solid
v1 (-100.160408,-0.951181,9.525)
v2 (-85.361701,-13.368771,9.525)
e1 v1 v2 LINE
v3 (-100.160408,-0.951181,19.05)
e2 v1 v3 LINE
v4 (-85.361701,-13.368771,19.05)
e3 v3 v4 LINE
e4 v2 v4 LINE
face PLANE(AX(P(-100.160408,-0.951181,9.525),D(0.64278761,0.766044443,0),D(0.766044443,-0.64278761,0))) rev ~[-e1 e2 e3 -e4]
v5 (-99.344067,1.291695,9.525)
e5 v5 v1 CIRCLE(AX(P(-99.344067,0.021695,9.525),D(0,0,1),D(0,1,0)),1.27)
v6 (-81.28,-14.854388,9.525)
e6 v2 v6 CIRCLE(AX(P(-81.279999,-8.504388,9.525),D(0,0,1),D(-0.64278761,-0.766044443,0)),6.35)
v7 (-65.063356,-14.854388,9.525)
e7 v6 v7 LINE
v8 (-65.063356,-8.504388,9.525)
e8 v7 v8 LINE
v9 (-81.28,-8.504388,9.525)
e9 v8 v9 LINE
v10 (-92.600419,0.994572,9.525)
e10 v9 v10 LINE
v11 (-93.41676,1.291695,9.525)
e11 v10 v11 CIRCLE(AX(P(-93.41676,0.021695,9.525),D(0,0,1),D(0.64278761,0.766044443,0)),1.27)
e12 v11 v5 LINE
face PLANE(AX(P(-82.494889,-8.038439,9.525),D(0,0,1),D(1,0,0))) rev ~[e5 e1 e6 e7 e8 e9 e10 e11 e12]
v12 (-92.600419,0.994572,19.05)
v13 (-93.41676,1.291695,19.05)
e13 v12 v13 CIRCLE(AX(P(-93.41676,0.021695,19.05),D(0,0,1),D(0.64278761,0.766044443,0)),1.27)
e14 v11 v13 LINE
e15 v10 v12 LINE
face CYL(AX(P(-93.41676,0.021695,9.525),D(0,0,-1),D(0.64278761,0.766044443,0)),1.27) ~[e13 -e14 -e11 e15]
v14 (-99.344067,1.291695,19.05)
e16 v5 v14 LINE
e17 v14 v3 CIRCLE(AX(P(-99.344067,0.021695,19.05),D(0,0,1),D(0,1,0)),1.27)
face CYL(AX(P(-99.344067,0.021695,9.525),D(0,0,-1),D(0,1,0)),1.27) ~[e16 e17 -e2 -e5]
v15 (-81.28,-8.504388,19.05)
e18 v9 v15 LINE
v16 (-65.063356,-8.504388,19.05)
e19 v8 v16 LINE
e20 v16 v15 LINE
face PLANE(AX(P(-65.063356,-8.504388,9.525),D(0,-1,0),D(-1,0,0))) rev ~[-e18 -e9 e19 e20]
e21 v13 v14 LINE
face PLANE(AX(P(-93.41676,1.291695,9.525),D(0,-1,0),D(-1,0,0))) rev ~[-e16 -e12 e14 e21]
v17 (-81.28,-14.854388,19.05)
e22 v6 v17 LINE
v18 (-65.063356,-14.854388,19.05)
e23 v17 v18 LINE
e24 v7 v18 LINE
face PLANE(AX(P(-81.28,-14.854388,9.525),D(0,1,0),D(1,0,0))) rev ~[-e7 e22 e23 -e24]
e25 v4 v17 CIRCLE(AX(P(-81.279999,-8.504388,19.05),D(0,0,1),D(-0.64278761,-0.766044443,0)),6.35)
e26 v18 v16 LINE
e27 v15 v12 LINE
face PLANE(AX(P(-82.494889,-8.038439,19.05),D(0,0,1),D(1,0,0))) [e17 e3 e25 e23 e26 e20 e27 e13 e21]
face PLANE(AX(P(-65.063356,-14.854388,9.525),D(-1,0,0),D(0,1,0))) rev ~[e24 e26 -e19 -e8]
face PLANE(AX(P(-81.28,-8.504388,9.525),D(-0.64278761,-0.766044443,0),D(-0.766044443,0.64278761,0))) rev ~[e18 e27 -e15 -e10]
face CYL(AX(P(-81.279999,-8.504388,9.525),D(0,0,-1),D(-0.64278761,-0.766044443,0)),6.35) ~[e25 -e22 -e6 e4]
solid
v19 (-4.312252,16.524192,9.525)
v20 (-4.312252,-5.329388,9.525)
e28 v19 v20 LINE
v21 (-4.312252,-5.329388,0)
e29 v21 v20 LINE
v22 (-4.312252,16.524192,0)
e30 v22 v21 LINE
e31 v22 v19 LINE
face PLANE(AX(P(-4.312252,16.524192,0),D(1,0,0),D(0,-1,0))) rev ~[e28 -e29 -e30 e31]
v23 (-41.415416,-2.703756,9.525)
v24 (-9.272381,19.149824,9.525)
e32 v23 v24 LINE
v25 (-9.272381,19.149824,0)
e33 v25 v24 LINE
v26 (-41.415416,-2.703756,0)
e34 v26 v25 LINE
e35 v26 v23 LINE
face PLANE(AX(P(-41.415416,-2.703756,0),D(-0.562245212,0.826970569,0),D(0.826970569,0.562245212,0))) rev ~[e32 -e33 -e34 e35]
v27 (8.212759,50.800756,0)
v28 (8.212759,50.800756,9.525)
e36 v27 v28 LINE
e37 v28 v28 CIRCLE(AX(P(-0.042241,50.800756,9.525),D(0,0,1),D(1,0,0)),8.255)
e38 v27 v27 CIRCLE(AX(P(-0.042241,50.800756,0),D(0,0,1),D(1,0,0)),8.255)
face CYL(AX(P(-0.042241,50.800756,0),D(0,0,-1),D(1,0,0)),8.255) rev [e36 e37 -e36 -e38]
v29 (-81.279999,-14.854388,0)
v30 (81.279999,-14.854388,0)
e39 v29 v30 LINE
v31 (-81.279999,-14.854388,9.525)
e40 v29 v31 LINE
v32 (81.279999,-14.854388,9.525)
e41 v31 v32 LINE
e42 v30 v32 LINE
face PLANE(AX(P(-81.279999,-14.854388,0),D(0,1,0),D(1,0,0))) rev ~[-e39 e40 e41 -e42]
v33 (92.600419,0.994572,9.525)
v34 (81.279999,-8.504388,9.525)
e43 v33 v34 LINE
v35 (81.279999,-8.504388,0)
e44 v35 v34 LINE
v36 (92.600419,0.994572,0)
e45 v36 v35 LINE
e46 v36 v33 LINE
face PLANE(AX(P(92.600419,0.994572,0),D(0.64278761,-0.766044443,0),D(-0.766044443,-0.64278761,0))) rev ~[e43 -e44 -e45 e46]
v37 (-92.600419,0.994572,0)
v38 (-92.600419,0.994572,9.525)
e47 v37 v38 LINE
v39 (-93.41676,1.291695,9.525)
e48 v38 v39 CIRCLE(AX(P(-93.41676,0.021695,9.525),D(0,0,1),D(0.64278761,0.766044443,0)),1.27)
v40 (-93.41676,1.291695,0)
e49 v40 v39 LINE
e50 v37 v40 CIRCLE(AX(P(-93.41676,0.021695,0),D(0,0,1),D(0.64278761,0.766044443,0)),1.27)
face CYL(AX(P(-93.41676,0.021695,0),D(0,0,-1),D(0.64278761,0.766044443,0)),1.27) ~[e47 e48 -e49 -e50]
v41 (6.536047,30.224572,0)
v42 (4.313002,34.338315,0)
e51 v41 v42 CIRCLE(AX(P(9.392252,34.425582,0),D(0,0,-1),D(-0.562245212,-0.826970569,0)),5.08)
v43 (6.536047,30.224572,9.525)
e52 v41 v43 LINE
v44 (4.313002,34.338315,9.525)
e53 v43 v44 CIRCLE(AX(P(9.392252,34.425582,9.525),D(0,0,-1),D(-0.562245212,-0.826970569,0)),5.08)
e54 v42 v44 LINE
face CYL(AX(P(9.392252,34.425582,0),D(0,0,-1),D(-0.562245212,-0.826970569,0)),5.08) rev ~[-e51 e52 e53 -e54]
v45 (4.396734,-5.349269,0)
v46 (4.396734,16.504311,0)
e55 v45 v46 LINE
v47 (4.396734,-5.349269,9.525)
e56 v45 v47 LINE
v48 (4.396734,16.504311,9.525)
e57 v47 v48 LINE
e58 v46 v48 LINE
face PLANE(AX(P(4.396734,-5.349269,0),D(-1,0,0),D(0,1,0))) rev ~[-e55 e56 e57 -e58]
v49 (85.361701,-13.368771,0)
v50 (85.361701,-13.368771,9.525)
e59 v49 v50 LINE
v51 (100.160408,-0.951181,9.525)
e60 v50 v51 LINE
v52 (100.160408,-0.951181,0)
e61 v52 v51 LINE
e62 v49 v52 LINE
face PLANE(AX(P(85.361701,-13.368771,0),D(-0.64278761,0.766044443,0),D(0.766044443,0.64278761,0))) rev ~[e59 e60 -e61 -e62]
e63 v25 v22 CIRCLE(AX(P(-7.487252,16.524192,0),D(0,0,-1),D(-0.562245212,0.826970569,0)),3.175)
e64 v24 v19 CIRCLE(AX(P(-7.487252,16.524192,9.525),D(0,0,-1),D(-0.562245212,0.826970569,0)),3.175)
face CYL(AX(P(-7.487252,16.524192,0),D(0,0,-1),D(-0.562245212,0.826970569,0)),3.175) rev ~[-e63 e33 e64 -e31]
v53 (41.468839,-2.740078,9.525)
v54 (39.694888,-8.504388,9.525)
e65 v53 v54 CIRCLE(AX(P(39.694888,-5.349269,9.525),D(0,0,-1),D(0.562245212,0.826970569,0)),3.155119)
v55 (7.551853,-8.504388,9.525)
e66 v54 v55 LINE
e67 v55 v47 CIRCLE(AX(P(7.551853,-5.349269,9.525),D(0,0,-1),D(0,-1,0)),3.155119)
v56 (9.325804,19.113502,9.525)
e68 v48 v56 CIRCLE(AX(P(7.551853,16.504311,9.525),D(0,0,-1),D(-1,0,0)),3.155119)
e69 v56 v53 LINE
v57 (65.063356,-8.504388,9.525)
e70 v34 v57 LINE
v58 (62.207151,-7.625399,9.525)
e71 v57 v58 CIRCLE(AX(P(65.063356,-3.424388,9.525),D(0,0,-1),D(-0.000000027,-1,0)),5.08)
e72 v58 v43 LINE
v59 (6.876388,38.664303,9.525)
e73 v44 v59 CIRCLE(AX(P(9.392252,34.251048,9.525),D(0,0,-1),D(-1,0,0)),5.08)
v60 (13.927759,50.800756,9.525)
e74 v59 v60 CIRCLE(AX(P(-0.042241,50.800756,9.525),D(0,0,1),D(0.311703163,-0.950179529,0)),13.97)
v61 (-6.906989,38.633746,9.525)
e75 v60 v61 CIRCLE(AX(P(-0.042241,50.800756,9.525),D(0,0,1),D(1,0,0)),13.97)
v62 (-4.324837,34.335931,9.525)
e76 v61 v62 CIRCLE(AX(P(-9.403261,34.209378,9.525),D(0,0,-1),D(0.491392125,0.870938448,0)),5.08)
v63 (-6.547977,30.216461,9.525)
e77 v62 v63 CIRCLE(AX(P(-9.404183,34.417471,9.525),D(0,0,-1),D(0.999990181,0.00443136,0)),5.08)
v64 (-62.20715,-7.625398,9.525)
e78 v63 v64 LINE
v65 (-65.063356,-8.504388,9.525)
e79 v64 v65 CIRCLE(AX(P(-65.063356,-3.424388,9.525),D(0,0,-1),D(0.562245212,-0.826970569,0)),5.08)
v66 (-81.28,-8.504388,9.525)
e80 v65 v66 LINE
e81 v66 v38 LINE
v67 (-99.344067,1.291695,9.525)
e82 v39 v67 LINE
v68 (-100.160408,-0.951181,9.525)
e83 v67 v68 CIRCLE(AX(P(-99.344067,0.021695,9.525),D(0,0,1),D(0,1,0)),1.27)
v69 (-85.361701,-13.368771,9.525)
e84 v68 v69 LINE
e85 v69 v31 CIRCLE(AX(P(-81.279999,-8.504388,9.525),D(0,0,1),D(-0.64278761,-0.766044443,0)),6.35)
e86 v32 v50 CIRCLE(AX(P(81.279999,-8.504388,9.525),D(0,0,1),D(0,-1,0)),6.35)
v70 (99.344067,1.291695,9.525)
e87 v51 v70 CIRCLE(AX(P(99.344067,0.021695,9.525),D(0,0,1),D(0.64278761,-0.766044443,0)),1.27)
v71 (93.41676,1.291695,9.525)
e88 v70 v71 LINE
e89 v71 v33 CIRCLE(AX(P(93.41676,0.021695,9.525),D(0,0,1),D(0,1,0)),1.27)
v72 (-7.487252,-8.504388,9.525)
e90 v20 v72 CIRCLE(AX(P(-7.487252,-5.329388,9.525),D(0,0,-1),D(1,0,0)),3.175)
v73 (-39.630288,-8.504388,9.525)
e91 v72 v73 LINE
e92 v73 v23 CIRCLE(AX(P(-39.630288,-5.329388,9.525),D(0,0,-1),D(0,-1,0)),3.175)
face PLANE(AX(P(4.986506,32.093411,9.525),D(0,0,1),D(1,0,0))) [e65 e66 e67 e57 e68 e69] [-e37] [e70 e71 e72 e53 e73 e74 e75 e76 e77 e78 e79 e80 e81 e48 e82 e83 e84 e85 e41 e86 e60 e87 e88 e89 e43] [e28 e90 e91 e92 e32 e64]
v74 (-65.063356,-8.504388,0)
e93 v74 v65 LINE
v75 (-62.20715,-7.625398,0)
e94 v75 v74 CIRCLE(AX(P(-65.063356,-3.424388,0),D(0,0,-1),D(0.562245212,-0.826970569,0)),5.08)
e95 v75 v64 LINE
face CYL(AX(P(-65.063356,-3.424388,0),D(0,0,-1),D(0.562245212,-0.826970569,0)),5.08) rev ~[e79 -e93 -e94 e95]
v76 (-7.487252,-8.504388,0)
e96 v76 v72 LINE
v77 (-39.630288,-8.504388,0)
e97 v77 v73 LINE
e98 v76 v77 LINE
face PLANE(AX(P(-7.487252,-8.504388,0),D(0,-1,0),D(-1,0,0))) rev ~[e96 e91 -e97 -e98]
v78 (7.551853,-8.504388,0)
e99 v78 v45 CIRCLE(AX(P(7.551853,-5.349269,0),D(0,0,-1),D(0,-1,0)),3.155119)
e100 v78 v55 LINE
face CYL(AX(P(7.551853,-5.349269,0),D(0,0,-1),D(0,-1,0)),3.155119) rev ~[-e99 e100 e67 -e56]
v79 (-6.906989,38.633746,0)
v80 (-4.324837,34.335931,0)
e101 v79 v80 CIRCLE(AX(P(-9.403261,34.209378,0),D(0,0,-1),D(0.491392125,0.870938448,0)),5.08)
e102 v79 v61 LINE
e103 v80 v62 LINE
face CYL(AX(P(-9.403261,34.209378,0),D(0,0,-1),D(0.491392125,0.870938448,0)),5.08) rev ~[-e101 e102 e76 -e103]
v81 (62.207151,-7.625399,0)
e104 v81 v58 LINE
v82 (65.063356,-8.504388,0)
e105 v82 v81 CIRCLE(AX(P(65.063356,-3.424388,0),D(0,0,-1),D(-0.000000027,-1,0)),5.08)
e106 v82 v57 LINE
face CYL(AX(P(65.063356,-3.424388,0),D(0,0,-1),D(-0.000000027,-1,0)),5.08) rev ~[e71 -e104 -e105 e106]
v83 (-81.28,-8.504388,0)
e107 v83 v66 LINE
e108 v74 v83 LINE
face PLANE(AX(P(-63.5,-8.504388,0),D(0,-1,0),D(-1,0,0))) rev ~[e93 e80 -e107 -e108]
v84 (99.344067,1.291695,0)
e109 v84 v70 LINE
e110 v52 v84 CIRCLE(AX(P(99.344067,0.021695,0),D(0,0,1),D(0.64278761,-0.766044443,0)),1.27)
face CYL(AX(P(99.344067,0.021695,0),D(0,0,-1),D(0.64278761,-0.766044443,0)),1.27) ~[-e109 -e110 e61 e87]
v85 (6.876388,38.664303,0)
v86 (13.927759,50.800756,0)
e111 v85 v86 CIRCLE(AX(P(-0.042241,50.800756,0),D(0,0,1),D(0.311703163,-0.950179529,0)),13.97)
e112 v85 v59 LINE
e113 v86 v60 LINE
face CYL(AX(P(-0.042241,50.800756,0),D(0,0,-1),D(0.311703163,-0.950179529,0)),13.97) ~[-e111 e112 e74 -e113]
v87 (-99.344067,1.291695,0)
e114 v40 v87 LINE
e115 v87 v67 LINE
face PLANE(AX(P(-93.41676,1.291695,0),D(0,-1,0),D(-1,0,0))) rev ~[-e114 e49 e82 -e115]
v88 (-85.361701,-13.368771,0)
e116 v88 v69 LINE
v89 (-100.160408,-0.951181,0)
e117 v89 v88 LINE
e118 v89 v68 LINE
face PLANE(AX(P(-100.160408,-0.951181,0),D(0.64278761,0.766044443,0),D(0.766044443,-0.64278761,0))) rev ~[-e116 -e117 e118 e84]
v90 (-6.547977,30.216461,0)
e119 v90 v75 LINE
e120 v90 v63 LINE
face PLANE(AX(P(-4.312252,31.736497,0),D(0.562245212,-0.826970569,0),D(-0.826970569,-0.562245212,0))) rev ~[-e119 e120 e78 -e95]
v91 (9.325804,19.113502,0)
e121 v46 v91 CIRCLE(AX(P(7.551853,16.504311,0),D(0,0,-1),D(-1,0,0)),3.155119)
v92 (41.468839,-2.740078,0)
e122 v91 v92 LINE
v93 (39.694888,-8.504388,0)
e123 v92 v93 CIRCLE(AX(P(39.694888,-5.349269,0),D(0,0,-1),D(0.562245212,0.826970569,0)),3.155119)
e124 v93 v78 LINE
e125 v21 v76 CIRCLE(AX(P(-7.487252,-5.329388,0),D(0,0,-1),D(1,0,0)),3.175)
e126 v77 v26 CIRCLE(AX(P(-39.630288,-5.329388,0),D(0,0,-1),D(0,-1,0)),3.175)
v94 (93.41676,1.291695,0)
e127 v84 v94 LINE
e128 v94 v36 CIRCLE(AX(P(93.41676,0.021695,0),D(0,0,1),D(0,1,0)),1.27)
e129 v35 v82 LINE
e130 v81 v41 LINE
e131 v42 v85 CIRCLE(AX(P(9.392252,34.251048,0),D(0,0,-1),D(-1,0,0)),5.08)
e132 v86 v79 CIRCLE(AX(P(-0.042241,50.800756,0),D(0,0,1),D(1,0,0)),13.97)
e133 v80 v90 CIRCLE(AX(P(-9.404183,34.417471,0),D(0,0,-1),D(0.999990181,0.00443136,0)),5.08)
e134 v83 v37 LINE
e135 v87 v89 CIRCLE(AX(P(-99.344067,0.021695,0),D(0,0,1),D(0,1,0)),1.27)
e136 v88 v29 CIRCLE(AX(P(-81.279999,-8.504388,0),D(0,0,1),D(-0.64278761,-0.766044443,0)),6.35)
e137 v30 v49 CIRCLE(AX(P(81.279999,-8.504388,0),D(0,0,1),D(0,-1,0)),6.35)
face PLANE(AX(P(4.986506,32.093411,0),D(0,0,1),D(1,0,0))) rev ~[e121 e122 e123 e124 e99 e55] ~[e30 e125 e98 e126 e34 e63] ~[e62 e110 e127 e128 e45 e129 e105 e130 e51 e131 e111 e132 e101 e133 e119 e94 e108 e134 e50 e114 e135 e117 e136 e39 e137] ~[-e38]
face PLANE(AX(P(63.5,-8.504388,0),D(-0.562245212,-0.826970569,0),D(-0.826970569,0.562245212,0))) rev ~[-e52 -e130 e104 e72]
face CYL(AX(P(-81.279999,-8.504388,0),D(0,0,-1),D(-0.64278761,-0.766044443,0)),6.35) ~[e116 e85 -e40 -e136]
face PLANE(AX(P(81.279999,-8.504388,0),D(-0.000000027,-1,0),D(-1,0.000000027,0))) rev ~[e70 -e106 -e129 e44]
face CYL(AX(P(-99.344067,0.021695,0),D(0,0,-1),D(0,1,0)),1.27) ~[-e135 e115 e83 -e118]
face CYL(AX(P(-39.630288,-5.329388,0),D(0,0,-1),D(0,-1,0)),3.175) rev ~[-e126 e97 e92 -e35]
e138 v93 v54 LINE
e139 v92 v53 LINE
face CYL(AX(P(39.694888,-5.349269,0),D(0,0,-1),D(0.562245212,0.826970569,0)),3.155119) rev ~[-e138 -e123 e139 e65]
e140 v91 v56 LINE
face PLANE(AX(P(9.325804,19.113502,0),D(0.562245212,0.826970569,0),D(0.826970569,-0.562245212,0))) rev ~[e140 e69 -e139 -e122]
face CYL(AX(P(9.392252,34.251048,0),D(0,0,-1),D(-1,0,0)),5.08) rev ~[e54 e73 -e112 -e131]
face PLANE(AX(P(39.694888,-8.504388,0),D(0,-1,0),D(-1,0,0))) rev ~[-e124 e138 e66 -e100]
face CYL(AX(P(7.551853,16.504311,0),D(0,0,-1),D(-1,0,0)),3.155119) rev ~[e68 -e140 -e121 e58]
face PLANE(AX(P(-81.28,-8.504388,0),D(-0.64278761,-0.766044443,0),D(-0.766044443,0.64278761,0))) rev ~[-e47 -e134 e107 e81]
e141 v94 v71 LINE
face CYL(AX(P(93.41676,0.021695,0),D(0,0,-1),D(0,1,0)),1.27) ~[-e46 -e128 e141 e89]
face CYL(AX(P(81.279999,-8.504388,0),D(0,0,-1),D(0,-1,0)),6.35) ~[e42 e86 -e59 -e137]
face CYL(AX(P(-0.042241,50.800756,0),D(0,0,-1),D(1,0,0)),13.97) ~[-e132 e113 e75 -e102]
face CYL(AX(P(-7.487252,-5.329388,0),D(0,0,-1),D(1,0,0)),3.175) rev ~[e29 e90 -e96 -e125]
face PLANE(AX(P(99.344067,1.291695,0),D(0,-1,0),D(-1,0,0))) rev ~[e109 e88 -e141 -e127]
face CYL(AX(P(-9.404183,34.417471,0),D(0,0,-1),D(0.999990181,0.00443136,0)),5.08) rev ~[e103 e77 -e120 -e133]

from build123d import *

# Parameters (mm, degrees)
F0_R        = 8.255
F1_DEPTH    = 9.525
F2_T1_DEPTH = 9.525
F4_DEPTH    = 9.525


# Not quite as in the source:
# - a fillet or chamfer that OpenCascade refuses, or shapes differently, is made with other operations: its cross-section is extruded or revolved along the edge and cut away or added
# - ends of sketch curves that miss each other by under 0.0002 mm in the source are joined
# - a feature names something its author has since deleted; it is built from what else it names


with BuildPart() as f1:
    # F0 (on Top) → F1 (new body)
    with BuildSketch(Plane.XY):
        with BuildLine():
            ThreePointArc((4.3122524784, 37.526747704), (-0.0112650872, 36.8307900709), (-4.3378264209, 37.5075678728))
            Line((-4.3378264209, 37.5075678728), (-4.3122524784, 31.736497147))
            Line((-4.3122524784, 31.736497147), (-63.5, -8.504387986))
            Line((-63.5, -8.504387986), (-81.28, -8.5043879861))
            Line((-81.28, -8.5043879861), (-92.6004192464, 0.9945716283))
            ThreePointArc((-92.6004192464, 0.9945716283), (-92.9823939286, 1.215104814), (-93.4167595107, 1.2916951856))
            Line((-93.4167595107, 1.2916951856), (-99.344067291, 1.2916951856))
            ThreePointArc((-99.344067291, 1.2916951856), (-100.5374769194, 0.4560607676), (-100.1604075553, -0.9511812572))
            Line((-100.1604075553, -0.9511812572), (-85.3617007511, -13.3687706785))
            ThreePointArc((-85.3617007511, -13.3687706785), (-83.4518273397, -14.4714366067), (-81.2799994295, -14.8543884647))
            Line((-81.2799994295, -14.8543884647), (55.6916793662, -14.8543884647))
            Line((55.6916793662, -14.8543884647), (81.2799994295, -14.8543884647))
            ThreePointArc((81.2799994295, -14.8543884647), (83.4518273397, -14.4714366067), (85.3617007511, -13.3687706785))
            Line((85.3617007511, -13.3687706785), (100.1604075553, -0.9511812572))
            ThreePointArc((100.1604075553, -0.9511812572), (100.5374769194, 0.4560607676), (99.344067291, 1.2916951856))
            Line((99.344067291, 1.2916951856), (93.4167595107, 1.2916951856))
            ThreePointArc((93.4167595107, 1.2916951856), (92.9823939286, 1.215104814), (92.6004192464, 0.9945716283))
            Line((92.6004192464, 0.9945716283), (81.2799994295, -8.5043884647))
            Line((81.2799994295, -8.5043884647), (63.5, -8.504387986))
            Line((63.5, -8.504387986), (4.3122524784, 31.736497147))
            Line((4.3122524784, 31.736497147), (4.3122524784, 37.526747704))
        make_face()
        with BuildLine():
            ThreePointArc((-9.272381027, 19.1498236636), (-6.0018498632, 19.3302933306), (-4.3122524784, 16.5241921081))
            Line((-4.3122524784, 16.5241921081), (-4.3122524784, -5.329387986))
            ThreePointArc((-4.3122524784, -5.329387986), (-5.2421884481, -7.5744520163), (-7.4872524784, -8.504387986))
            Line((-7.4872524784, -8.504387986), (-39.630287523, -8.504387986))
            ThreePointArc((-39.630287523, -8.504387986), (-42.6648389881, -6.2632629272), (-41.4154160715, -2.7037564306))
            Line((-41.4154160715, -2.7037564306), (-9.272381027, 19.1498236636))
        make_face(mode=Mode.SUBTRACT)
        with BuildLine():
            Line((4.3967338988, -5.3492686827), (4.3967338988, 16.5043114114))
            ThreePointArc((4.3967338988, 16.5043114114), (6.0757516386, 19.2928418474), (9.3258039242, 19.1135022159))
            Line((9.3258039242, 19.1135022159), (41.4688389688, -2.7400778782))
            ThreePointArc((41.4688389688, -2.7400778782), (42.7104384529, -6.2772960382), (39.6948882467, -8.504387986))
            Line((39.6948882467, -8.504387986), (7.5518532022, -8.504387986))
            ThreePointArc((7.5518532022, -8.504387986), (5.3208469473, -7.5802749375), (4.3967338988, -5.3492686827))
        make_face(mode=Mode.SUBTRACT)
        with BuildLine():
            ThreePointArc((4.3122524784, 37.526747704), (11.2713168612, 42.6053719635), (13.9277592898, 50.8007557298))
            ThreePointArc((13.9277592898, 50.8007557298), (-8.2626898349, 62.0961138999), (-4.3378264209, 37.5075678728))
            ThreePointArc((-4.3378264209, 37.5075678728), (-0.0112650872, 36.8307900709), (4.3122524784, 37.526747704))
        make_face()
        with Locations((-0.0422407102, 50.8007557298)):
            Circle(F0_R, mode=Mode.SUBTRACT)
    extrude(amount=F1_DEPTH)

    # F2: fillet of radius 5.08 on 6 edges, made by hand

    # F2_s2 → F2_t1 (join)
    with BuildSketch(Plane.XY):
        with BuildLine():
            ThreePointArc((6.5360468007, 30.2245718646), (4.9024905224, 32.0489381691), (4.3122524784, 34.4255823534))
            Line((4.3122524784, 34.4255823534), (4.3122524784, 31.736497147))
            Line((4.3122524784, 31.736497147), (6.5360468007, 30.2245718646))
        make_face()
        with BuildLine():
            ThreePointArc((4.3122524784, 34.2510476275), (4.9998161704, 36.8030866711), (6.8763876281, 38.6643031214))
            ThreePointArc((6.8763876281, 38.6643031214), (5.6229446638, 38.0310033956), (4.3122524784, 37.526747704))
            Line((4.3122524784, 37.526747704), (4.3122524784, 34.2510476275))
        make_face()
        with BuildLine():
            ThreePointArc((-4.3242327121, 34.4399823871), (-4.909166003, 32.0507806283), (-6.5479771563, 30.2164605901))
            Line((-6.5479771563, 30.2164605901), (-4.3122524784, 31.736497147))
            Line((-4.3122524784, 31.736497147), (-4.3242327121, 34.4399823871))
        make_face()
        with BuildLine():
            ThreePointArc((-6.9069886961, 38.6337456168), (-5.0221798353, 36.7808624145), (-4.3233105691, 34.2318896113))
            Line((-4.3233105691, 34.2318896113), (-4.3378264209, 37.5075678728))
            ThreePointArc((-4.3378264209, 37.5075678728), (-5.6507459596, 38.0060080235), (-6.9069886961, 38.6337456168))
        make_face()
        with BuildLine():
            ThreePointArc((65.063356077, -8.5043880281), (63.5691562425, -8.2796703522), (62.207150536, -7.6253985169))
            Line((62.207150536, -7.6253985169), (63.5, -8.504387986))
            Line((63.5, -8.504387986), (65.063356077, -8.5043880281))
        make_face()
        with BuildLine():
            ThreePointArc((-62.2071504741, -7.6253984748), (-63.569156246, -8.2796703302), (-65.0633561518, -8.504387986))
            Line((-65.0633561518, -8.504387986), (-63.5, -8.504387986))
            Line((-63.5, -8.504387986), (-62.2071504741, -7.6253984748))
        make_face()
    extrude(amount=F2_T1_DEPTH)


with BuildPart() as f4:
    # F3 (on face) → F4 (new body)
    with BuildSketch(Plane.XY.offset(9.525)):
        with BuildLine():
            ThreePointArc((-92.6004192464, 0.9945716283), (-92.9823939286, 1.215104814), (-93.4167595107, 1.2916951856))
            Line((-93.4167595107, 1.2916951856), (-99.344067291, 1.2916951856))
            ThreePointArc((-99.344067291, 1.2916951856), (-100.5374769194, 0.4560607676), (-100.1604075553, -0.9511812572))
            Line((-100.1604075553, -0.9511812572), (-85.3617007511, -13.3687706785))
            ThreePointArc((-85.3617007511, -13.3687706785), (-83.451827419, -14.4714365778), (-81.2799995983, -14.8543884647))
            Line((-81.2799995983, -14.8543884647), (-65.0633561518, -14.8543884647))
            Line((-65.0633561518, -14.8543884647), (-65.0633561518, -8.504387986))
            Line((-65.0633561518, -8.504387986), (-81.28, -8.5043879861))
            Line((-81.28, -8.5043879861), (-92.6004192464, 0.9945716283))
        make_face()
    extrude(amount=F4_DEPTH)


solid = Compound([f1.part, f4.part])
